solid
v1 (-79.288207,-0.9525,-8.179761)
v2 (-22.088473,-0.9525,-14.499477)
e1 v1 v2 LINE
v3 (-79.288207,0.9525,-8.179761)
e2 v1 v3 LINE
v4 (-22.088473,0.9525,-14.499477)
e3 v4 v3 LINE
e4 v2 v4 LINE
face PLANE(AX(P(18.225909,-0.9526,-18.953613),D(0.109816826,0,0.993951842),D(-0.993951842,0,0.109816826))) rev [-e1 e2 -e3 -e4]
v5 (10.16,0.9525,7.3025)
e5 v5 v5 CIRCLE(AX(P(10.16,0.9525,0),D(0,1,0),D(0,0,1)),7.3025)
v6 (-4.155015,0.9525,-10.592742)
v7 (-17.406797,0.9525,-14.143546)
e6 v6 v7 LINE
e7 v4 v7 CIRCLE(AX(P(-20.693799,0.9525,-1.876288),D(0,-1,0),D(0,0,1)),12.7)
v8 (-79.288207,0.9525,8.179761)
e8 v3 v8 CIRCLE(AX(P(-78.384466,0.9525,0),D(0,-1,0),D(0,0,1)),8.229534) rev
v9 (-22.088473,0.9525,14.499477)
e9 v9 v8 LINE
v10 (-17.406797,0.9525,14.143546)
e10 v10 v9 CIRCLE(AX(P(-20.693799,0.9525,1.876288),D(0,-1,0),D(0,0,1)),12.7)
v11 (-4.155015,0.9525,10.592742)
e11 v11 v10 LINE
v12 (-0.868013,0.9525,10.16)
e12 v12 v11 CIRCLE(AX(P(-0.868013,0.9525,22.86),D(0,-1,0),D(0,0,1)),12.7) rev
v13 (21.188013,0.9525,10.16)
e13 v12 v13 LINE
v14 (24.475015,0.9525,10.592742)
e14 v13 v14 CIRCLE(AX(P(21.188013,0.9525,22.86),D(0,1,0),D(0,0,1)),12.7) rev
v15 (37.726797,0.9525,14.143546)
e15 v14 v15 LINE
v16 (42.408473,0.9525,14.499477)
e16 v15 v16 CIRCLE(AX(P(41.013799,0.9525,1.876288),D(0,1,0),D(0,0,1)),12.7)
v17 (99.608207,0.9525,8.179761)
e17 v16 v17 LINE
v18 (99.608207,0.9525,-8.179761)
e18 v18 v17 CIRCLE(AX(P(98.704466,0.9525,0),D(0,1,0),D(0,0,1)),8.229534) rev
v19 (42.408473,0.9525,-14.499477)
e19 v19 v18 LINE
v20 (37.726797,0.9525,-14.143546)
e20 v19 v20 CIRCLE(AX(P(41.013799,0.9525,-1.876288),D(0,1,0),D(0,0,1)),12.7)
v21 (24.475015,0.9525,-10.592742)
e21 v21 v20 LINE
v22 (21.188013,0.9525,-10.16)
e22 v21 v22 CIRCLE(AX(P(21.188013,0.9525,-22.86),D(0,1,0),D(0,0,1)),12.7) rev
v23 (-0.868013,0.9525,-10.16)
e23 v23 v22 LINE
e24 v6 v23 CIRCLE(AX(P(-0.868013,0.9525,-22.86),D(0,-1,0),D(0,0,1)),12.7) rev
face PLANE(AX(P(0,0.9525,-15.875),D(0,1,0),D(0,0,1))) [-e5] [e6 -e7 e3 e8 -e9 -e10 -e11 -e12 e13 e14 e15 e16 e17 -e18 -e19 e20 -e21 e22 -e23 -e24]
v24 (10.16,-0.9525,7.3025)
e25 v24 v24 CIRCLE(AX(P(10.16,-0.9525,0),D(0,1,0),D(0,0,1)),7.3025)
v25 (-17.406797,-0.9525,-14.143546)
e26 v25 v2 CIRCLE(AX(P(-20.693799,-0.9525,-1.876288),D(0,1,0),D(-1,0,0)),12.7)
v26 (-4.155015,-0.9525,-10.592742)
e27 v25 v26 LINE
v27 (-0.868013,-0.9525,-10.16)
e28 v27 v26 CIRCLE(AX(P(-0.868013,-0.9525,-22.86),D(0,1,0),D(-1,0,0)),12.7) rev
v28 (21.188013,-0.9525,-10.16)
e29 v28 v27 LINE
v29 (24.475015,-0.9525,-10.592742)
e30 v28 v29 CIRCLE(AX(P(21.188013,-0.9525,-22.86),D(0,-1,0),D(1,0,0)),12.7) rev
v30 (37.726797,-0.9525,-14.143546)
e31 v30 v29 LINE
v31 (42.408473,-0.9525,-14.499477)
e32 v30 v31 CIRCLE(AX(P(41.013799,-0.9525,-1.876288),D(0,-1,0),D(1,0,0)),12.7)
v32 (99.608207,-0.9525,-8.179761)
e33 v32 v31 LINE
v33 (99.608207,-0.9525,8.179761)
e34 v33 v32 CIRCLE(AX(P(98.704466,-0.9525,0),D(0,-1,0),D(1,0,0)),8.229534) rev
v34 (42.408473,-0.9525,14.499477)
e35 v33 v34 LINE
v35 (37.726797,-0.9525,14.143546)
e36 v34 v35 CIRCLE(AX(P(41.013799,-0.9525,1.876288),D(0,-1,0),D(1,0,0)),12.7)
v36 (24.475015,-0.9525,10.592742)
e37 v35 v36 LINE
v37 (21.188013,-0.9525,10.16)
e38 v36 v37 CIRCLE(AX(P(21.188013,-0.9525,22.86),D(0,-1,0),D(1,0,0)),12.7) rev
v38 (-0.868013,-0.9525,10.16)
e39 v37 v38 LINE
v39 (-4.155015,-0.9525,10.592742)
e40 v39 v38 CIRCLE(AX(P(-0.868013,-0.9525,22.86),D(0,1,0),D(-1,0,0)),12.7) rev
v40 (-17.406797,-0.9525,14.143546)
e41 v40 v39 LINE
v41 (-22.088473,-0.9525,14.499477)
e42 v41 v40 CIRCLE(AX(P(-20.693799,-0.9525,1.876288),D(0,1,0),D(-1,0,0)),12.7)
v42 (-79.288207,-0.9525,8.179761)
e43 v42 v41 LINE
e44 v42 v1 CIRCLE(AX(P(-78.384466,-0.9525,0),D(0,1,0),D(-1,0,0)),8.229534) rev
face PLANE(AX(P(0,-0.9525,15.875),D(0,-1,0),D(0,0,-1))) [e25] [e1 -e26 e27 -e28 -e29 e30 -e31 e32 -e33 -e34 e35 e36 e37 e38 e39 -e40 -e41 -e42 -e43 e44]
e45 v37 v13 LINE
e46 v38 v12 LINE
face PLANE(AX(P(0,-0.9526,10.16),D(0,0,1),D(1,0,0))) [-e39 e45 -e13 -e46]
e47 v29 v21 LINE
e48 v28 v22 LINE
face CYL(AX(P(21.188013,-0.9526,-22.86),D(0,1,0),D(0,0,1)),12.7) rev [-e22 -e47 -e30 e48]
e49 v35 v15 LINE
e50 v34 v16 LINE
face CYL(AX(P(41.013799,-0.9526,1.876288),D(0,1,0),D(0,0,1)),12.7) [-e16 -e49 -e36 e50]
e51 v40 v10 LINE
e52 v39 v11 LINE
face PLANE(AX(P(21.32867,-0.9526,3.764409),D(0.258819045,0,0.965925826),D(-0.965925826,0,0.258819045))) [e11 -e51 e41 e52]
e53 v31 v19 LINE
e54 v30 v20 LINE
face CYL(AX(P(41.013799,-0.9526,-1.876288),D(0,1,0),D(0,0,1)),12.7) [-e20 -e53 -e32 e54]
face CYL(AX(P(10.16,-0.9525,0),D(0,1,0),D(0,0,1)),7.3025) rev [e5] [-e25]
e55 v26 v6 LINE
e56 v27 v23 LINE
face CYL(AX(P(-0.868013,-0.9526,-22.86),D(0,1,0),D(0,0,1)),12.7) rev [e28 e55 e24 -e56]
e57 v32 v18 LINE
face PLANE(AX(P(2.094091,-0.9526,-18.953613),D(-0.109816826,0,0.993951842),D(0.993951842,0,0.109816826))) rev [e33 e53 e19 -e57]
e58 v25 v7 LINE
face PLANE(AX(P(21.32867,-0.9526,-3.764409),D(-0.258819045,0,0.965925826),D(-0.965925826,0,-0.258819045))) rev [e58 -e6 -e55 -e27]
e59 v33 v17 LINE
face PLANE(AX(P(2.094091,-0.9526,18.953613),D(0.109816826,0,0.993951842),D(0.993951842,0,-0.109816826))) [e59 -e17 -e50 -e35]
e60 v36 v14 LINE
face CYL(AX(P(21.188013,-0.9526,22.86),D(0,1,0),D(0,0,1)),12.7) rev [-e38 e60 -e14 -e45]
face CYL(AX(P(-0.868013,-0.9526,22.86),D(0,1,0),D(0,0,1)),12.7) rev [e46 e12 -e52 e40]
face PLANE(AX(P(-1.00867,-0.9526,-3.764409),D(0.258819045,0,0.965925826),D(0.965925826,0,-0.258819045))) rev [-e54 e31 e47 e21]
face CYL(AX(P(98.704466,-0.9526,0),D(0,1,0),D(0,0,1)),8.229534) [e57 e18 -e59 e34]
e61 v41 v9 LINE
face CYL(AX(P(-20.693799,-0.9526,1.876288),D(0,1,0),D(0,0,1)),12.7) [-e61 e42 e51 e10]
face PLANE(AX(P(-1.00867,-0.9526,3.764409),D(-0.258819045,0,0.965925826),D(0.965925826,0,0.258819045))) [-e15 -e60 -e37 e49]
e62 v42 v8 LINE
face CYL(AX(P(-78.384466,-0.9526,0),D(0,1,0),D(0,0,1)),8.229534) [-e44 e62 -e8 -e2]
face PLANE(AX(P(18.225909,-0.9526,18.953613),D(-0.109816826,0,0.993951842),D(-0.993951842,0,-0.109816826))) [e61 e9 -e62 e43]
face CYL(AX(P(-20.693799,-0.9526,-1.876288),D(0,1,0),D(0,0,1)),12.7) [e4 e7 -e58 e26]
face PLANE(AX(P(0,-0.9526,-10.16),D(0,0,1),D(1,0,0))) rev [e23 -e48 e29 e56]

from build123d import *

# Parameters (mm, degrees)
LOFT1_START        = -0.9525
LOFT1_DEPTH        = 1.905
CUT_EXTRUDE2_DEPTH = 110.33494104
SKETCH5_R          = 7.3025
CUT_EXTRUDE3_DEPTH = 108.939694094


with BuildPart() as part:
    # Loft1: read off the stored shape, not the designer's step
    # Loft1 outline → Loft1 (new body)
    with BuildSketch(Plane(origin=(0, 0, 0), x_dir=(1, 0, 0), z_dir=(0, 1, 0)).offset(LOFT1_START)):
        with BuildLine():
            add(Edge.make_bspline(
                [(0, -15.875), (21.314656151, -21.106845313), (57.417925413, -25.838728987), (92.603989484, -17.720178647), (106.934, -10.795)],
                knots=[0, 0, 0, 0, 0.588632913, 1, 1, 1, 1], degree=3))
            Line((106.934, -10.795), (106.934, 10.795))
            add(Edge.make_bspline(
                [(0, 15.875), (21.314656151, 21.106845313), (57.417925413, 25.838728987), (92.603989484, 17.720178647), (106.934, 10.795)],
                knots=[0, 0, 0, 0, 0.588632913, 1, 1, 1, 1], degree=3))
            Line((0, 15.875), (0, -15.875))
        make_face()
    extrude(amount=LOFT1_DEPTH)

    # Sketch4 → Cut-Extrude2 (cut, through all)
    with BuildSketch(Plane(origin=(0, 0.9525, 0), x_dir=(1, 0, 0), z_dir=(0, 1, 0))):
        with BuildLine():
            Line((0, 15.875), (0, 3e-09))
            ThreePointArc((0, 3e-09), (2.975795104, 7.184204898), (10.16, 10.16))
            Line((10.16, 10.16), (21.188013281, 10.16))
            ThreePointArc((21.188013281, 10.16), (22.845695922, 10.268650261), (24.475015153, 10.592742006))
            Line((24.475015153, 10.592742006), (37.72679711, 14.14354628))
            ThreePointArc((37.72679711, 14.14354628), (40.05104351, 14.539743655), (42.408472673, 14.499476682))
            Line((42.408472673, 14.499476682), (99.60820705, 8.179760764))
            ThreePointArc((99.60820705, 8.179760764), (104.834824793, 5.490348999), (106.934, 0))
            Line((106.934, 0), (106.934, 10.795))
            add(Edge.make_bspline(
                [(0, 15.875), (21.314656151, 21.106845313), (57.417925413, 25.838728987), (92.603989484, 17.720178647), (106.934, 10.795)],
                knots=[0, 0, 0, 0, 0.588632913, 1, 1, 1, 1], degree=3))
        make_face()
        with BuildLine():
            Line((21.188013281, -10.16), (10.16, -10.16))
            ThreePointArc((10.16, -10.16), (2.975795102, -7.184204896), (0, 3e-09))
            Line((0, 3e-09), (0, -15.875))
            add(Edge.make_bspline(
                [(0, -15.875), (21.314656151, -21.106845313), (57.417925413, -25.838728987), (92.603989484, -17.720178647), (106.934, -10.795)],
                knots=[0, 0, 0, 0, 0.588632913, 1, 1, 1, 1], degree=3))
            Line((106.934, -10.795), (106.934, 0))
            ThreePointArc((106.934, 0), (104.834824793, -5.490348999), (99.60820705, -8.179760764))
            Line((99.60820705, -8.179760764), (42.408472673, -14.499476682))
            ThreePointArc((42.408472673, -14.499476682), (40.05104351, -14.539743655), (37.72679711, -14.14354628))
            Line((37.72679711, -14.14354628), (24.475015153, -10.592742006))
            ThreePointArc((24.475015153, -10.592742006), (22.845695922, -10.268650261), (21.188013281, -10.16))
        make_face()
    extrude(amount=-CUT_EXTRUDE2_DEPTH, mode=Mode.SUBTRACT)

    # Sketch5 → Cut-Extrude3 (cut, through all)
    with BuildSketch(Plane(origin=(0, 0.9525, 0), x_dir=(1, 0, 0), z_dir=(0, 1, 0))):
        with Locations(Location((10.16, 0, 0), (0, 0, 270))):
            Circle(SKETCH5_R)
    extrude(amount=-CUT_EXTRUDE3_DEPTH, mode=Mode.SUBTRACT)

    # Mirror1: part across plane


with BuildPart() as part_1:
    add(part.part)
    add(part.part.mirror(Plane(origin=(10.16, 0, 0), x_dir=(0, 0, 1), z_dir=(1, 0, 0))))


solid = part_1.part
